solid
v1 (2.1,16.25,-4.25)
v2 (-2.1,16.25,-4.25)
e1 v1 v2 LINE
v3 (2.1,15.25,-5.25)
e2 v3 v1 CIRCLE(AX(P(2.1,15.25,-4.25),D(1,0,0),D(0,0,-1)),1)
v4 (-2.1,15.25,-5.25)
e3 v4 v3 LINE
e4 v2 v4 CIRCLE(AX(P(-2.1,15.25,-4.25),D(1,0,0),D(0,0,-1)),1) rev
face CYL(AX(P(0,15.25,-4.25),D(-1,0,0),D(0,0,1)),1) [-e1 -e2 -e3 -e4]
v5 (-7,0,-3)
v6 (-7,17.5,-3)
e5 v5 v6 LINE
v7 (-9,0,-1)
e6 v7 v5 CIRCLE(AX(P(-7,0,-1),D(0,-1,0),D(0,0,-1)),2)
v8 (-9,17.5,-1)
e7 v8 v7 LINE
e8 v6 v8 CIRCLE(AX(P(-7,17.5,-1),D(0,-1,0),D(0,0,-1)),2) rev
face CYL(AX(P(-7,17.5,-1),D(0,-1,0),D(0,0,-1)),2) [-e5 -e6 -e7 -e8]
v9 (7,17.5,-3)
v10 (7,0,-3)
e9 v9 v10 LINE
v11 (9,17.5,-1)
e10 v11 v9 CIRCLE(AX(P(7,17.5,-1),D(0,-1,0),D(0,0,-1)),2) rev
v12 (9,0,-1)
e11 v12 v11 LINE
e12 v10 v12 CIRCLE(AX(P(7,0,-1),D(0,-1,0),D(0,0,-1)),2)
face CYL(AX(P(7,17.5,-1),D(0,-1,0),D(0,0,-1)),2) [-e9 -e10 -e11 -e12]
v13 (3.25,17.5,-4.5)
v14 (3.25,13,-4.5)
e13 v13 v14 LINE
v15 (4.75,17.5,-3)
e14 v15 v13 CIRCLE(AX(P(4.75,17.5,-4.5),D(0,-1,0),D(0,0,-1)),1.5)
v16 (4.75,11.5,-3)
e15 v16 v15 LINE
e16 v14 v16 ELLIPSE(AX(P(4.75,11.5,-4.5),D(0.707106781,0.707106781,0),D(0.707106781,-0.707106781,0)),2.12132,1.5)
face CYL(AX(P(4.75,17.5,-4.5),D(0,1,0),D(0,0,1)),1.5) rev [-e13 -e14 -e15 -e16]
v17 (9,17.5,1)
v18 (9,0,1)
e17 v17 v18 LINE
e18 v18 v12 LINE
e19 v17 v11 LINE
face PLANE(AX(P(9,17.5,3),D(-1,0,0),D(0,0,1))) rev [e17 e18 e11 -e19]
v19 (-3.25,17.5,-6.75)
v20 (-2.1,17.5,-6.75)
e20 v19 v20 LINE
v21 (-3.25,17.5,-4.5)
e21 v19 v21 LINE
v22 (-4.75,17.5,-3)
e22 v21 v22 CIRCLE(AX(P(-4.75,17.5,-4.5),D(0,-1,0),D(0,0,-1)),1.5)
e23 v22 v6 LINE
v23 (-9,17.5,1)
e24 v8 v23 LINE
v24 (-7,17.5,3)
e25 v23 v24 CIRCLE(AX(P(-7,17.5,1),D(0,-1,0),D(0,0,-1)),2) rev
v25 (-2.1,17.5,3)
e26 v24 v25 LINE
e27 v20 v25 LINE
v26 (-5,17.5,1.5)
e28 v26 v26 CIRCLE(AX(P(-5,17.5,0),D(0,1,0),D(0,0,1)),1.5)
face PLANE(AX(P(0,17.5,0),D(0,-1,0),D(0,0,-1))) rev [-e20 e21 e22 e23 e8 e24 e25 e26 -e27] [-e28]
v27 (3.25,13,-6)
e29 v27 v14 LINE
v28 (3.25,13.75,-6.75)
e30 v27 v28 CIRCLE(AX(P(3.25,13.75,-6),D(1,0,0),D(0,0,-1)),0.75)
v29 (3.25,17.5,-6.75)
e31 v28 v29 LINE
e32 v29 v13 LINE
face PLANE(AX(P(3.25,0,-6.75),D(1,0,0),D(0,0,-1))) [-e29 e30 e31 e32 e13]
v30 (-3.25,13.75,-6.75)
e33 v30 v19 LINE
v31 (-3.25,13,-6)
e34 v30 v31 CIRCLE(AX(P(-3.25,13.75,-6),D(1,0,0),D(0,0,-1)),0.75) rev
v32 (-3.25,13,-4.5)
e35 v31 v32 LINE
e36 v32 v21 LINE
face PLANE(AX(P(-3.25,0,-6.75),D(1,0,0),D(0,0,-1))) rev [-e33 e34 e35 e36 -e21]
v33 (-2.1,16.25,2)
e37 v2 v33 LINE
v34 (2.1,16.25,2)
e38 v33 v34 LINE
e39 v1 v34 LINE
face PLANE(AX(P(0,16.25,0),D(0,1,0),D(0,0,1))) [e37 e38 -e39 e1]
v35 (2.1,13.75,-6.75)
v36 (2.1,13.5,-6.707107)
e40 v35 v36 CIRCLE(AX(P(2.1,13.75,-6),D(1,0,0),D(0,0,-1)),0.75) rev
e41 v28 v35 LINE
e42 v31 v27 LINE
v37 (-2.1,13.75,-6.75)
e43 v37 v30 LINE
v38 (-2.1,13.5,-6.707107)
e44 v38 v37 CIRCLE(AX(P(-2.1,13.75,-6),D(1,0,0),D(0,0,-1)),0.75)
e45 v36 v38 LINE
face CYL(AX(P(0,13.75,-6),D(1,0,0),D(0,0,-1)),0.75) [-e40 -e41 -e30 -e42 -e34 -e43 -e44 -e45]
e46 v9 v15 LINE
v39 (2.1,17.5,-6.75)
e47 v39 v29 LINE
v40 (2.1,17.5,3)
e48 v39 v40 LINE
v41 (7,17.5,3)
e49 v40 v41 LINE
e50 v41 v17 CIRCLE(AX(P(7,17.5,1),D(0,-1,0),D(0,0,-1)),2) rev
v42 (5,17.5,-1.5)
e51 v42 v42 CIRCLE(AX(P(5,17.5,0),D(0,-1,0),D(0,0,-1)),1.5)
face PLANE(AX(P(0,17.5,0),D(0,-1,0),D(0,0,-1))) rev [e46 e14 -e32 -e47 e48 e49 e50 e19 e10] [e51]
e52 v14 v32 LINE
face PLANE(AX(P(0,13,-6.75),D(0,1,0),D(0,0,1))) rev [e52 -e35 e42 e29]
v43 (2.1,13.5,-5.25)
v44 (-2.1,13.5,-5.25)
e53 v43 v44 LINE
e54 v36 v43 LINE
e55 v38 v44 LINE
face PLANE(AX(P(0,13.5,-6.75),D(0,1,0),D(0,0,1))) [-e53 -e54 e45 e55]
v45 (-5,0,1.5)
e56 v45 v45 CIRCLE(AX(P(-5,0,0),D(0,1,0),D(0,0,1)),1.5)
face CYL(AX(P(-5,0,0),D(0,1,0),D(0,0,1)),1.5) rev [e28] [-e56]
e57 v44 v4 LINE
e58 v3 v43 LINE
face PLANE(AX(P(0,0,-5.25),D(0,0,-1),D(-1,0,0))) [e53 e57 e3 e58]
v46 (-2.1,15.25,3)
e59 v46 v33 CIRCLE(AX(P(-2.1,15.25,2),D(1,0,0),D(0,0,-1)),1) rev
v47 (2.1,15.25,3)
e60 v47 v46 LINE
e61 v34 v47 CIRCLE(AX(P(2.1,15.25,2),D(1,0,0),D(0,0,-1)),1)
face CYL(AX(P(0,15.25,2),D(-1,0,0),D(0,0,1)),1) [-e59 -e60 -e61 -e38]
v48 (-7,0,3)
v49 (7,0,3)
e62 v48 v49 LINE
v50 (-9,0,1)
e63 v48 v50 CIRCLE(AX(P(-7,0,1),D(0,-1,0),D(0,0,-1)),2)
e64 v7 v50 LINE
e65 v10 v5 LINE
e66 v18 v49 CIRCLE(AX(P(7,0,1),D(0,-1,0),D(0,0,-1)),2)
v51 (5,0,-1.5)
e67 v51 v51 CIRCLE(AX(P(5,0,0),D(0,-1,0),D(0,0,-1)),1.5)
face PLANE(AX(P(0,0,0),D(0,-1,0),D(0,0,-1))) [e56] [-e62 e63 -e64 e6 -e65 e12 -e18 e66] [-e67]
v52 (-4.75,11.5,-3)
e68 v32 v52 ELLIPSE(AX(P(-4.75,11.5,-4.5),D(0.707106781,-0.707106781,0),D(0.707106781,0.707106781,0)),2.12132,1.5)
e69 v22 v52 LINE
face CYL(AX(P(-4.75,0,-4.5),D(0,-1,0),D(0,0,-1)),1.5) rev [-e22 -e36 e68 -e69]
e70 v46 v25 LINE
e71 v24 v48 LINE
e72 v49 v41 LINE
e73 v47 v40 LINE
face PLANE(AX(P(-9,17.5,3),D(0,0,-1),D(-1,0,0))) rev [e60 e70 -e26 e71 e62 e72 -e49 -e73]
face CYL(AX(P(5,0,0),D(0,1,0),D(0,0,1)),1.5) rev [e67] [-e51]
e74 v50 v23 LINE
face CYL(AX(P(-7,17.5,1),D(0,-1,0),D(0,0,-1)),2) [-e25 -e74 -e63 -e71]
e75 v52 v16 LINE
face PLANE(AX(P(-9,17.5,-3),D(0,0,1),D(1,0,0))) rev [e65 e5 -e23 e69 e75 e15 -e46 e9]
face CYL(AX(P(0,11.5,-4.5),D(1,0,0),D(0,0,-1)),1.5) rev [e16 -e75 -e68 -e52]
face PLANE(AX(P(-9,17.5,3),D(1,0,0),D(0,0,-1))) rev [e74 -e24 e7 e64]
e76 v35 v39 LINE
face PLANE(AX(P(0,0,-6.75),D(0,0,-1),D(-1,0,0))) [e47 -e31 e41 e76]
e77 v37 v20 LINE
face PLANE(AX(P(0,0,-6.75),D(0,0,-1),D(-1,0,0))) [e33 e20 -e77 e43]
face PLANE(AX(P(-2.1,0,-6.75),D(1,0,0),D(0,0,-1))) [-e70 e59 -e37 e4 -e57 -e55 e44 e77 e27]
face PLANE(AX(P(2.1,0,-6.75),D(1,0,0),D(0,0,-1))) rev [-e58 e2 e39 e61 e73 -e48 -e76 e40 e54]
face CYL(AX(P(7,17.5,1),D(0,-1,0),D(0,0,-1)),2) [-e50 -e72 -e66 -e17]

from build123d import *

# Parameters (mm, degrees)
SKETCH1_W           = 18
SKETCH1_H           = 6
BOSS_EXTRUDE1_DEPTH = 17.5
SKETCH2_R           = 1.5
CUT_EXTRUDE1_DEPTH  = 20.906029237
FILLET1_R           = 2
BOSS_EXTRUDE2_DEPTH = 3.75
SKETCH4_W           = 4.2
SKETCH4_H           = 4
BOSS_EXTRUDE3_DEPTH = 2.25
SKETCH5_W           = 4.2
SKETCH5_H           = 8.25
CUT_EXTRUDE2_DEPTH  = 1.25
FILLET5_R           = 1
FILLET6_R           = 1.5
FILLET7_R           = 0.75


with BuildPart() as part:
    # Sketch1 → Boss-Extrude1 (new body)
    with BuildSketch(Plane(origin=(0, 0, 0), x_dir=(1, 0, 0), z_dir=(0, 1, 0))):
        Rectangle(SKETCH1_W, SKETCH1_H)
    extrude(amount=BOSS_EXTRUDE1_DEPTH)

    # Sketch2 → Cut-Extrude1 (cut, through all)
    with BuildSketch(Plane(origin=(0, 17.5, 0), x_dir=(1, 0, 0), z_dir=(0, 1, 0))):
        with Locations(Location((-5, 0, 0), (0, 0, 270))):
            Circle(SKETCH2_R)
        with Locations(Location((5, 0, 0), (0, 0, 90))):
            Circle(SKETCH2_R)
    extrude(amount=-CUT_EXTRUDE1_DEPTH, mode=Mode.SUBTRACT)

    # Fillet1
    fillet1_edges = [part.edges().sort_by_distance(p)[0] for p in [
        (9, 8.75, 3),
        (-9, 8.75, 3),
        (-9, 8.75, -3),
        (9, 8.75, -3),
    ]]
    fillet(fillet1_edges, radius=FILLET1_R)

    # Sketch3 → Boss-Extrude2 (add)
    with BuildSketch(Plane(origin=(0, 0, -3), x_dir=(-1, 0, 0), z_dir=(0, 0, -1))):
        Polygon((-3.25, 17.5), (-3.25, 13), (3.25, 13), (3.25, 17.5), (2.1, 17.5), (2.1, 13.5), (-2.1, 13.5), (-2.1, 17.5), align=None)
    extrude(amount=BOSS_EXTRUDE2_DEPTH)

    # Sketch4 → Boss-Extrude3 (add)
    with BuildSketch(Plane(origin=(0, 0, -3), x_dir=(-1, 0, 0), z_dir=(0, 0, -1))):
        with Locations((0, 15.5)):
            Rectangle(SKETCH4_W, SKETCH4_H)
    extrude(amount=BOSS_EXTRUDE3_DEPTH)

    # Sketch5 → Cut-Extrude2 (cut)
    with BuildSketch(Plane(origin=(0, 17.5, 0), x_dir=(1, 0, 0), z_dir=(0, 1, 0))):
        with Locations((0, 1.125)):
            Rectangle(SKETCH5_W, SKETCH5_H)
    extrude(amount=-CUT_EXTRUDE2_DEPTH, mode=Mode.SUBTRACT)

    # Fillet5
    fillet5_edges = [part.edges().sort_by_distance(p)[0] for p in [
        (0, 16.25, 3),
        (0, 16.25, -5.25),
    ]]
    fillet(fillet5_edges, radius=FILLET5_R)

    # Fillet6
    fillet6_edges = [part.edges().sort_by_distance(p)[0] for p in [
        (0, 13, -3),
        (-3.25, 15.25, -3),
        (3.25, 15.25, -3),
    ]]
    fillet(fillet6_edges, radius=FILLET6_R)

    # Fillet7
    # the kernel refuses this fillet: 0.75 mm, written as the material it takes off along each edge
    with BuildSketch(Plane(origin=(5.125, 13, -6.75), x_dir=(0, 1, 0), z_dir=(-1, 0, 0))) as fillet7_piece_1:
        with BuildLine():
            CenterArc((FILLET7_R, -FILLET7_R), FILLET7_R, 90, 90)
            Line((0, -FILLET7_R), (0, 0))
            Line((0, 0), (FILLET7_R, 0))
        make_face()
    extrude(amount=10.25, mode=Mode.SUBTRACT)


solid = part.part
